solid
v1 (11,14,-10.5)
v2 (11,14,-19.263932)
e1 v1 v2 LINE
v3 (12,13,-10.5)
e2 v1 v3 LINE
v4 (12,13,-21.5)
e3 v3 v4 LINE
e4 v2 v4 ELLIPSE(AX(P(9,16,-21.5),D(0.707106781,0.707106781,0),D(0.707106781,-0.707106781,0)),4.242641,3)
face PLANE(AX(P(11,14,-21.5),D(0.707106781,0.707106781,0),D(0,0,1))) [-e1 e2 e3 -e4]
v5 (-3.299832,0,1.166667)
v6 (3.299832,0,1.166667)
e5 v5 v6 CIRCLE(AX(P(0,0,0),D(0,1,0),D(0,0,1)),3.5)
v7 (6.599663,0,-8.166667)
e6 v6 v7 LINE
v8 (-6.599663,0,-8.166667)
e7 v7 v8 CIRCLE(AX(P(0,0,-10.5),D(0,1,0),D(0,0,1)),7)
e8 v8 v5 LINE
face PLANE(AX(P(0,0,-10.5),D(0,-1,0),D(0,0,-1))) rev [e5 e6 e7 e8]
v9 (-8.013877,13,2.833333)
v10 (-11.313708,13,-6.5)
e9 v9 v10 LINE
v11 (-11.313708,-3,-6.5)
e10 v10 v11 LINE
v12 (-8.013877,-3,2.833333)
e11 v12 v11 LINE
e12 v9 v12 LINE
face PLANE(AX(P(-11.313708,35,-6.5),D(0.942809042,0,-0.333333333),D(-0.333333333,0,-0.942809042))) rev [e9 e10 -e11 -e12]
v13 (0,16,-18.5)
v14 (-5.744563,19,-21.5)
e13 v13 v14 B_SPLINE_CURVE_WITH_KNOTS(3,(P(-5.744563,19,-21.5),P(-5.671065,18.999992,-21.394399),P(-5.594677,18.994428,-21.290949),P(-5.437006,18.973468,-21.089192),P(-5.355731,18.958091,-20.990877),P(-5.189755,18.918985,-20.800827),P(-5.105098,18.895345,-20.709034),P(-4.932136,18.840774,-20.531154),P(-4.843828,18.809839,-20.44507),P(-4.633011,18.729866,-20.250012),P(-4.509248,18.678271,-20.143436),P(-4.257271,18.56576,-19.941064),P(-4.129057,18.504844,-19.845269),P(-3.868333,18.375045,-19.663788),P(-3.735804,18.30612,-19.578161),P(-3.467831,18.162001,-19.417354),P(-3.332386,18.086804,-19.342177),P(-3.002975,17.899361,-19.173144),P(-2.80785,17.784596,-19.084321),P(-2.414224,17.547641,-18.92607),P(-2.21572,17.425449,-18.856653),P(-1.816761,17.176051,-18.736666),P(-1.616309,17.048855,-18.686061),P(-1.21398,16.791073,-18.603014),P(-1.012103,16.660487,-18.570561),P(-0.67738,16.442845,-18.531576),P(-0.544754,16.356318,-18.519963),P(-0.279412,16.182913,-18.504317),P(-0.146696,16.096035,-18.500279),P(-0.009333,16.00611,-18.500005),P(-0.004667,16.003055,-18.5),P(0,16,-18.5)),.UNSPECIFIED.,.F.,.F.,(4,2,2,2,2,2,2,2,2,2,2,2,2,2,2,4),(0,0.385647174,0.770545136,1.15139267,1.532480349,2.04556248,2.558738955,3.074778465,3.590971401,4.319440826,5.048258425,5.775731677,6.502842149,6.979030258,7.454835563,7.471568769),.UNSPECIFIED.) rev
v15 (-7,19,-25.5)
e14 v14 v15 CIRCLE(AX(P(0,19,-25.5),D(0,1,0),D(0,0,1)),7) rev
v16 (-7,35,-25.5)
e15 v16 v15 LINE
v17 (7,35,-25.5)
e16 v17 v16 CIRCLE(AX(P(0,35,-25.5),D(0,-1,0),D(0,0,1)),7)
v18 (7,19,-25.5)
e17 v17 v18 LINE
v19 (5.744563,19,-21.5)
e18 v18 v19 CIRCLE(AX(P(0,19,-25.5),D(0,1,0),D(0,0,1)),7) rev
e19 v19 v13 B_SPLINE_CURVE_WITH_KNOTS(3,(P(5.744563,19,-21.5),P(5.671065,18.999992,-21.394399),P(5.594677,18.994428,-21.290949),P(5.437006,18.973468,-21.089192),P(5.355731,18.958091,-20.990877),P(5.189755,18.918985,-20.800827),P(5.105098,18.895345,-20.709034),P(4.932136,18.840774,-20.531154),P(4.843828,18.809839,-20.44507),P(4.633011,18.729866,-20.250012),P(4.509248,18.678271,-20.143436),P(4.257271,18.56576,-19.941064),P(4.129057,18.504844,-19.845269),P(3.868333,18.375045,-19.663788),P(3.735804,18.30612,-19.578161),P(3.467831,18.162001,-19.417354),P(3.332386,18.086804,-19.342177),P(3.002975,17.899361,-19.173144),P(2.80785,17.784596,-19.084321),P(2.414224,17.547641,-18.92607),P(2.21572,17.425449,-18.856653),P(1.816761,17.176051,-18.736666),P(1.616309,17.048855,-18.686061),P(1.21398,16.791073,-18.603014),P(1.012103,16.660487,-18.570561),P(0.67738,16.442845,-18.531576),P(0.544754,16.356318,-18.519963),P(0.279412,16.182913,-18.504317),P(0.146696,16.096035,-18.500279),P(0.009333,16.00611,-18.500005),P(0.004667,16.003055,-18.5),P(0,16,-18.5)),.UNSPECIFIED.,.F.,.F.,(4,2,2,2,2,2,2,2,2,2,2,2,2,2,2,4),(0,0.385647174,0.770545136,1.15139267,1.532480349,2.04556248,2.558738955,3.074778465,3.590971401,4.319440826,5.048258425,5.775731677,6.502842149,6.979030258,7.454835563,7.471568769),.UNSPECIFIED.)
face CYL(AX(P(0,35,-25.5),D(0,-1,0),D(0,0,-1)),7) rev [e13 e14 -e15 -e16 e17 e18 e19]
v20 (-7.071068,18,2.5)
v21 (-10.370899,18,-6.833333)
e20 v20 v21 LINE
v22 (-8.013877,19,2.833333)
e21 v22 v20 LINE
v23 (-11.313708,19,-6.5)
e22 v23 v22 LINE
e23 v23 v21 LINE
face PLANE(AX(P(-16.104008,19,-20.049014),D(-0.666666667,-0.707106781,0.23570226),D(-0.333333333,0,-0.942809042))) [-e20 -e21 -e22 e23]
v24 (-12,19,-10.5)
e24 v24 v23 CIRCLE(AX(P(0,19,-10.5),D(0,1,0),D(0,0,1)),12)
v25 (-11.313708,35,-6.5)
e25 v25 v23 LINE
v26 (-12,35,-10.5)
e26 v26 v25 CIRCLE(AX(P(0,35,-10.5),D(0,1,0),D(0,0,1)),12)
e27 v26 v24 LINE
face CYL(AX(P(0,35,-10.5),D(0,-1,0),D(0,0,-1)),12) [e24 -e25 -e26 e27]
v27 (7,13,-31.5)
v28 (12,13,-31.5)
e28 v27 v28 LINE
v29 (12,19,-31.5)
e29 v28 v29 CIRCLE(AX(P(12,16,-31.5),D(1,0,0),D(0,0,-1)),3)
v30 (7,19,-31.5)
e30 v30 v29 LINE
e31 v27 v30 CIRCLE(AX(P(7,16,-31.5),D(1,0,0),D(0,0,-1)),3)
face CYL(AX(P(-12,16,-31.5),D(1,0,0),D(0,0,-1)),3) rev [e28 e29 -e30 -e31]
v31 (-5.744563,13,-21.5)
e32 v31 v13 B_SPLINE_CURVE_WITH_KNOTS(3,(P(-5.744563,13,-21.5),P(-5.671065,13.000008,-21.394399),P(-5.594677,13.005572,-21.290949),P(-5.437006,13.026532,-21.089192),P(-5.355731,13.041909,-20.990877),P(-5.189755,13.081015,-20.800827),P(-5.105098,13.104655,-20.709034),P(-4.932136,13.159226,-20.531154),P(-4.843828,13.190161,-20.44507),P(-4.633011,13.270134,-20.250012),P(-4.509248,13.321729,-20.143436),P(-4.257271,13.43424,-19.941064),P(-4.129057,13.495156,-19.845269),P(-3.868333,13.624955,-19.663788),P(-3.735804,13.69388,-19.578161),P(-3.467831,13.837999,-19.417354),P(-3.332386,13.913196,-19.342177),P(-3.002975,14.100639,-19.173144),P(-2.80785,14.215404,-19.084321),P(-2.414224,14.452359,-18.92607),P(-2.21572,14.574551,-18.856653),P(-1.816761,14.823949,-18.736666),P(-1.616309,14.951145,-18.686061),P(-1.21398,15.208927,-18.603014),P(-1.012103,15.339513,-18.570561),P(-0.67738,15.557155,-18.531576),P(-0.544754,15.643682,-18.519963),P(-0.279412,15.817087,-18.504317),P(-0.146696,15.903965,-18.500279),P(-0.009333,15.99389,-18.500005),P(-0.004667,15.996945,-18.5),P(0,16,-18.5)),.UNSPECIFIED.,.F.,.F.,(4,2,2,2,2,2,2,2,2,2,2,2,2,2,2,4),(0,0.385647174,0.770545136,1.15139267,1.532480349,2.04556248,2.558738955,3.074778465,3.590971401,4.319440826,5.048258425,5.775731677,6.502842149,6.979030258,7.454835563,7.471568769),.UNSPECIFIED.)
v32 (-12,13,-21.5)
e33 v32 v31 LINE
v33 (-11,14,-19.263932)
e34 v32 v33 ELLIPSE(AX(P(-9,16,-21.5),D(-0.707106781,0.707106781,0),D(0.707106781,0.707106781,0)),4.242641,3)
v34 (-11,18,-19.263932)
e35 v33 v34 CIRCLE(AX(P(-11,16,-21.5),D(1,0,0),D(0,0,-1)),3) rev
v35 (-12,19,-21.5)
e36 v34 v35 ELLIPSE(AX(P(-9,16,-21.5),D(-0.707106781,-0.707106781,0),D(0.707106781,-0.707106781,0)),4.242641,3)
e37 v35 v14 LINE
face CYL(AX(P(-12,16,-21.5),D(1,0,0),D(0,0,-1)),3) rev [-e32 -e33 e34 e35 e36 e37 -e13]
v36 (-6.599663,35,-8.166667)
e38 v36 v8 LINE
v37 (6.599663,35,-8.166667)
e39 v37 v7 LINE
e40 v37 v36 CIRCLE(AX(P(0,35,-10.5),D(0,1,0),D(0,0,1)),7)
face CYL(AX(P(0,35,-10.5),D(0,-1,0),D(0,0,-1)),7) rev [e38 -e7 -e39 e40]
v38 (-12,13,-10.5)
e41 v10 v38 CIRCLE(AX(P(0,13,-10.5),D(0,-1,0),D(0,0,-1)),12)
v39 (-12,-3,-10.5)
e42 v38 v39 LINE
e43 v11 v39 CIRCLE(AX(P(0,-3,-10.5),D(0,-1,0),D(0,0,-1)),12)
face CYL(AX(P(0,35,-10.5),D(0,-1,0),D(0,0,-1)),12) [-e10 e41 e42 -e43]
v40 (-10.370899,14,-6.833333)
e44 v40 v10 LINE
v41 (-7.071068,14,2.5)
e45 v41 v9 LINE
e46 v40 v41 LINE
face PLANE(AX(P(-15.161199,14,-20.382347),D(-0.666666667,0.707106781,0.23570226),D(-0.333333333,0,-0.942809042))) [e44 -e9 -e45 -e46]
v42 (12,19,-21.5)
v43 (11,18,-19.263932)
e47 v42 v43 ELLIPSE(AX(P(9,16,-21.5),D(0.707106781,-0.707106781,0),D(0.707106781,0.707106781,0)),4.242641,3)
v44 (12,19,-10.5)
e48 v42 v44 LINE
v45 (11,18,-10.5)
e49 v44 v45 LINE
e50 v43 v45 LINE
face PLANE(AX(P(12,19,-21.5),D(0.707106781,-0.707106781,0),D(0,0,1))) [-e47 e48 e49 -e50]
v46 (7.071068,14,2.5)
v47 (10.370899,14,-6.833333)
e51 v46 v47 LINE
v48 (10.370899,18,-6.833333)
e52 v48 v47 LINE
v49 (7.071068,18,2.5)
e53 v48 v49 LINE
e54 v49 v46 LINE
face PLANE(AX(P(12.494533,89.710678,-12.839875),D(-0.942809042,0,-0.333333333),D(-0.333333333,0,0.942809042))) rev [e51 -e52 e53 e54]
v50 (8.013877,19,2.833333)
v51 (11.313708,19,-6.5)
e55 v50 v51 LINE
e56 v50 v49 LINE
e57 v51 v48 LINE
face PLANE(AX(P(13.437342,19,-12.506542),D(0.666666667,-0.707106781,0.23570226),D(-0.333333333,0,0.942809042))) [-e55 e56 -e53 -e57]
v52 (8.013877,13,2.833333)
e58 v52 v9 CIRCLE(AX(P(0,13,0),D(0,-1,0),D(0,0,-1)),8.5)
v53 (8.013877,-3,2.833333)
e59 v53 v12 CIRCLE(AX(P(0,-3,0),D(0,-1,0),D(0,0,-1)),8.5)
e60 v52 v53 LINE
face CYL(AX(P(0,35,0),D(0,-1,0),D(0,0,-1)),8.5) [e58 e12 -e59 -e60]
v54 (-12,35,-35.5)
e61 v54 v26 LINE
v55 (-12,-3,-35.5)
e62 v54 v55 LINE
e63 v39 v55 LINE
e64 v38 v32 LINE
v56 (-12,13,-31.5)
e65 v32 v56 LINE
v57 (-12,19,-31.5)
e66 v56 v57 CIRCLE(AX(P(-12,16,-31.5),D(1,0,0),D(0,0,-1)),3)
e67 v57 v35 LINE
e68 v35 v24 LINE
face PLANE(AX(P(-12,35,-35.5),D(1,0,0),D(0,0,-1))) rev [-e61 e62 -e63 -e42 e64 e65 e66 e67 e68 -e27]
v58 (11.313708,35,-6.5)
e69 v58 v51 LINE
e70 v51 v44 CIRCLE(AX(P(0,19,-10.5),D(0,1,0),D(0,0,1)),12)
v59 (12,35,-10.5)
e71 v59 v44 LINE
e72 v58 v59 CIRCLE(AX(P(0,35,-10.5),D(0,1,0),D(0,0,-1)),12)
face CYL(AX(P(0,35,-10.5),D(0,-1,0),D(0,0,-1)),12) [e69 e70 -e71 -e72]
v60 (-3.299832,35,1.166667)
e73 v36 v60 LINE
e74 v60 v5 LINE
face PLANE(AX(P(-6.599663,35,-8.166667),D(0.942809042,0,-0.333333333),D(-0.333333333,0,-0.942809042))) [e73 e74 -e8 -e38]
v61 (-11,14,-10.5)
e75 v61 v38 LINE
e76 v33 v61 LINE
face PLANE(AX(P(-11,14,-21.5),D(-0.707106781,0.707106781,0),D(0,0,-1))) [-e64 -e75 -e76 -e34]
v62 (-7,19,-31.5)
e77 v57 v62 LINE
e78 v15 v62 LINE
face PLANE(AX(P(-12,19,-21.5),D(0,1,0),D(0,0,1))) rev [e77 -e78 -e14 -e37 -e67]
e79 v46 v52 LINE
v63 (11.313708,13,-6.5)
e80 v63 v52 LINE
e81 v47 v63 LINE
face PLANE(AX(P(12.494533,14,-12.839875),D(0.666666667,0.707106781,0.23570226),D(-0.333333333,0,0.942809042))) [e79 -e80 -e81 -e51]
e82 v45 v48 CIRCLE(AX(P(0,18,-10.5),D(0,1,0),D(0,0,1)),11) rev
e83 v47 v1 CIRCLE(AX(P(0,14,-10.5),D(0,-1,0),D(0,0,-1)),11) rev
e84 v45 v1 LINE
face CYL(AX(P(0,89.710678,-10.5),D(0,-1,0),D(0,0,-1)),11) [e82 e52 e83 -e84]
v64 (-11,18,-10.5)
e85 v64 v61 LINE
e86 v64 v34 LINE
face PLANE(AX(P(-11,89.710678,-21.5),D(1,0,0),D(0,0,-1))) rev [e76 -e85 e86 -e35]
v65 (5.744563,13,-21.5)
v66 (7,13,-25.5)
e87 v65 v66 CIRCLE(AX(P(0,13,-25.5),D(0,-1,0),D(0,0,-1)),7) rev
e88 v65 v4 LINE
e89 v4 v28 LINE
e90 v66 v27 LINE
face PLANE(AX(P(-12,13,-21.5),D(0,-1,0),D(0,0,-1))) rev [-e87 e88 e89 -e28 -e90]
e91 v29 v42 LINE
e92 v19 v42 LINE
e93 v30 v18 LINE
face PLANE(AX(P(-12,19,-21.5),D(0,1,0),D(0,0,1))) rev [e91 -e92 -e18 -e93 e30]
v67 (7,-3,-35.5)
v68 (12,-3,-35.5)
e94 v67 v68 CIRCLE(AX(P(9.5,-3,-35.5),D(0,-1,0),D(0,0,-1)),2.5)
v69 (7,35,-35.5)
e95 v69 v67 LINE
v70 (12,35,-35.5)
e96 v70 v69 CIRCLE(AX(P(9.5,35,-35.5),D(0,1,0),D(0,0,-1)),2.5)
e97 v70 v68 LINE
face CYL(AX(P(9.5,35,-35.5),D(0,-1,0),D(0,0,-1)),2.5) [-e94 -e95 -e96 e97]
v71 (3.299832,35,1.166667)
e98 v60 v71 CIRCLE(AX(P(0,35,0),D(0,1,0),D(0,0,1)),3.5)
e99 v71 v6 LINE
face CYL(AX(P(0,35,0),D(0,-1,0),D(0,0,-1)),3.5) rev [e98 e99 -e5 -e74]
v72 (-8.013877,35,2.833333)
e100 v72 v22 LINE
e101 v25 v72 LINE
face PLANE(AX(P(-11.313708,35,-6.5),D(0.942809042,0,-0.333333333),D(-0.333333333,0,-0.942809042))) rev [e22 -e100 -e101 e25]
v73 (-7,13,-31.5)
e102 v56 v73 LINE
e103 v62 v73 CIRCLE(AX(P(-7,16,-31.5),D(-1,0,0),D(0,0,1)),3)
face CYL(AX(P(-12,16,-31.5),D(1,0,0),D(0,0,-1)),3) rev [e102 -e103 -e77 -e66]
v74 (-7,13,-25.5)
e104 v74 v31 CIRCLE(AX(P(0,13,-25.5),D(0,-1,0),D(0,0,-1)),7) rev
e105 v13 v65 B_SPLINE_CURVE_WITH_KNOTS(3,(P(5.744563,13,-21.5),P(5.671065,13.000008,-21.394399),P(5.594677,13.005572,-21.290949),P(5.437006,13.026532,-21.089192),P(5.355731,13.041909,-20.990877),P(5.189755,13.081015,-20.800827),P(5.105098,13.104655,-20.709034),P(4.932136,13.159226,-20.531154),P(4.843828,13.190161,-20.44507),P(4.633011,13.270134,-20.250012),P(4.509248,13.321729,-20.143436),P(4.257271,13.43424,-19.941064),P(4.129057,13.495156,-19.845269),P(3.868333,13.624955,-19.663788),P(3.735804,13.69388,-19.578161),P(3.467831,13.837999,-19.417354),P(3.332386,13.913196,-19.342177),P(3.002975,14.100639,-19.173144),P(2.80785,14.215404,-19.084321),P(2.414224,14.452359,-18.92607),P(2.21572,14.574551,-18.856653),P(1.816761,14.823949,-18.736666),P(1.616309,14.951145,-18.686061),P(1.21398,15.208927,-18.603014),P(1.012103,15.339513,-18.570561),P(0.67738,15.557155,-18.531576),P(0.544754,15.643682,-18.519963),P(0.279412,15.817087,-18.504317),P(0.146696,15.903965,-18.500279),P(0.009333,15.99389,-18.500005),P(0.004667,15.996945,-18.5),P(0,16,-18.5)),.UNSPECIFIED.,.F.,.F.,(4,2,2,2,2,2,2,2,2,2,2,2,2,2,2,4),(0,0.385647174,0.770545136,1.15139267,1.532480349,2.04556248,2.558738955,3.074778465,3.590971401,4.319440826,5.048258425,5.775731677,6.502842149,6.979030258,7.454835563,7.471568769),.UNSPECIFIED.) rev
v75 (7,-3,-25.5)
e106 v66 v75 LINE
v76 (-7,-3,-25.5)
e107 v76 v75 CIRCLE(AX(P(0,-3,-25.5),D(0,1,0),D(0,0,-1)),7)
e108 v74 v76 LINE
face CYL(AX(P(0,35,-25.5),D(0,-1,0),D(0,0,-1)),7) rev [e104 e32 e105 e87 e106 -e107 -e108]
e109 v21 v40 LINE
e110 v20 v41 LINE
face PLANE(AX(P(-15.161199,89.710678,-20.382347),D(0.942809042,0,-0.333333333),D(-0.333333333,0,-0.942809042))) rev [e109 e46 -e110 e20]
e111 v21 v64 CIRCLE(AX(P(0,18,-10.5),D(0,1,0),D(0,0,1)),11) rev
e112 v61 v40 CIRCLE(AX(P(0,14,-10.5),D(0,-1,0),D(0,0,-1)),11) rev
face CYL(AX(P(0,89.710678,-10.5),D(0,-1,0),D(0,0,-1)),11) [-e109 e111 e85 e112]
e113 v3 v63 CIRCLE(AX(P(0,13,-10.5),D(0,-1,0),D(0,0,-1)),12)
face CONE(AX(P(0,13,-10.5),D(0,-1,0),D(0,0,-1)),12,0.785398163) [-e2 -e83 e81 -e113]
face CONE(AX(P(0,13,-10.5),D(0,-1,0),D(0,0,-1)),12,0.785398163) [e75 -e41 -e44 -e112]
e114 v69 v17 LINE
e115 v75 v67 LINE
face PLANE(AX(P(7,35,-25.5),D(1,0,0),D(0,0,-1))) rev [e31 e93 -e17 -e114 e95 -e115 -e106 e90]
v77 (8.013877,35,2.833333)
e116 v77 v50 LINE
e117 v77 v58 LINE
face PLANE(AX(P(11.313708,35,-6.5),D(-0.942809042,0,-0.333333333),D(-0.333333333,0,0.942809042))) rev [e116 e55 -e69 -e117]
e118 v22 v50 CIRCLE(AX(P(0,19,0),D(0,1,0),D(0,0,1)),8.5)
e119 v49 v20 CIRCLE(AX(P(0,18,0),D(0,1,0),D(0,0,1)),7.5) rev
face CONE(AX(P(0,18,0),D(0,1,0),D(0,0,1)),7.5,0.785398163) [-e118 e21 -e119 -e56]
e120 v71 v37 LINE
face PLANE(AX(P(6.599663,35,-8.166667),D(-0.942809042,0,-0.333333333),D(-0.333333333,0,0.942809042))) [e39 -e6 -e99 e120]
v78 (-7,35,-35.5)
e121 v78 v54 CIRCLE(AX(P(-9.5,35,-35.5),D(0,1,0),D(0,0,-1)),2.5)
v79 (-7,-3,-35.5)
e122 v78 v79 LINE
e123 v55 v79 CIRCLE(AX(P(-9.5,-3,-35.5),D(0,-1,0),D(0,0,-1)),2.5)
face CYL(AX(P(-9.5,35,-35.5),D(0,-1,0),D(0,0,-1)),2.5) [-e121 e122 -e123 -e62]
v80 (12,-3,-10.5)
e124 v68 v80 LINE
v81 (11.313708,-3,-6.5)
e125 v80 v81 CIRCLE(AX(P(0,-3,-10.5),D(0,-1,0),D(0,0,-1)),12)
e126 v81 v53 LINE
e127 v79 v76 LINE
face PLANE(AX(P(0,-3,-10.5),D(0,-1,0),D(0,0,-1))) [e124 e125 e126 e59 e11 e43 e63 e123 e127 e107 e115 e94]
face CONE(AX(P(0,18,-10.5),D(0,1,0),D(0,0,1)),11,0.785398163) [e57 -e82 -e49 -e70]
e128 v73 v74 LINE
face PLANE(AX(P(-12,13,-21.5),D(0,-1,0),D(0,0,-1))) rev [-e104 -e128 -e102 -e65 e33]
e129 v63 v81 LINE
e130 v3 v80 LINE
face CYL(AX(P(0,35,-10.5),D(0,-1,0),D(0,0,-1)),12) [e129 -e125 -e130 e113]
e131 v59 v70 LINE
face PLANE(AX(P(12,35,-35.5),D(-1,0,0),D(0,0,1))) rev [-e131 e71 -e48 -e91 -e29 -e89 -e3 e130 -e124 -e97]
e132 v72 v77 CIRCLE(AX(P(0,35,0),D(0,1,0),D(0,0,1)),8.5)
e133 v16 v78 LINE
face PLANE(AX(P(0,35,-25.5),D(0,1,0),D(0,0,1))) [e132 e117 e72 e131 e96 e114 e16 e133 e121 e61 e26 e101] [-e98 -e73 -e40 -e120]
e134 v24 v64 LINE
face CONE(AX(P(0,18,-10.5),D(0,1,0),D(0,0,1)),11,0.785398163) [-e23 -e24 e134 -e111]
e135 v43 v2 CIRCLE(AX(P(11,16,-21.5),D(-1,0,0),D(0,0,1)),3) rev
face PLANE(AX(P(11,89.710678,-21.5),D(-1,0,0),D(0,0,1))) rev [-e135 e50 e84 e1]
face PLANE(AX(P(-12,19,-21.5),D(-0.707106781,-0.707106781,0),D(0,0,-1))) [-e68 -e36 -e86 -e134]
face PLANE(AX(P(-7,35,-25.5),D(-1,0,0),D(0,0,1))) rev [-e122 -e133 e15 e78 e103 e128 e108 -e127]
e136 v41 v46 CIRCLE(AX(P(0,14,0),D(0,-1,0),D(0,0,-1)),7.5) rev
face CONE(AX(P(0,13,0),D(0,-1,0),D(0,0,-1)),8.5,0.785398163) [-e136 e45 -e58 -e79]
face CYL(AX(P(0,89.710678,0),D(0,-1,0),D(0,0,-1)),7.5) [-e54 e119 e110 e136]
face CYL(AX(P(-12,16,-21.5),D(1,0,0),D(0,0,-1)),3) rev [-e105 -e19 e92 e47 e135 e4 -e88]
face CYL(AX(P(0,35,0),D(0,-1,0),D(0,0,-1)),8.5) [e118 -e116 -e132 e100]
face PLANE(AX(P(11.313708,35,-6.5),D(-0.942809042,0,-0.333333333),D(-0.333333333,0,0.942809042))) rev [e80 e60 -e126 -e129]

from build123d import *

# Parameters (mm, degrees)
BOSS_EXTRUDE1_DEPTH     = 35
BOSS_EXTRUDE2_START     = 3
BOSS_EXTRUDE2_DEPTH     = 3
CUT_EXTRUDE1_DEPTH      = 54.037722425
CUT_EXTRUDE1_DEPTH_BACK = 54.037722425
CUT_EXTRUDE2_START      = -3
CUT_EXTRUDE2_DEPTH      = 6
CHAMFER1_SIZE           = 1


with BuildPart() as part:
    # Sketch1 → Boss-Extrude1 (new body)
    with BuildSketch(Plane(origin=(0, 0, 0), x_dir=(1, 0, 0), z_dir=(0, 1, 0))):
        with BuildLine():
            Line((7, 25.5), (7, 35.5))
            ThreePointArc((7, 35.5), (9.5, 38), (12, 35.5))
            Line((12, 35.5), (12, 10.5))
            ThreePointArc((12, 10.5), (11.827182716, 8.470776255), (11.313708499, 6.5))
            Line((11.313708499, 6.5), (8.013876853, -2.833333333))
            ThreePointArc((8.013876853, -2.833333333), (0, -8.5), (-8.013876853, -2.833333333))
            Line((-8.013876853, -2.833333333), (-11.313708499, 6.5))
            ThreePointArc((-11.313708499, 6.5), (-11.827182716, 8.470776255), (-12, 10.5))
            Line((-12, 10.5), (-12, 35.5))
            ThreePointArc((-12, 35.5), (-9.5, 38), (-7, 35.5))
            Line((-7, 35.5), (-7, 25.5))
            ThreePointArc((-7, 25.5), (0, 18.5), (7, 25.5))
        make_face()
        with BuildLine():
            Line((-6.599663291, 8.166666667), (-3.299831646, -1.166666667))
            ThreePointArc((-3.299831646, -1.166666667), (0, -3.5), (3.299831646, -1.166666667))
            Line((3.299831646, -1.166666667), (6.599663291, 8.166666667))
            ThreePointArc((6.599663291, 8.166666667), (0, 17.5), (-6.599663291, 8.166666667))
        make_face(mode=Mode.SUBTRACT)
    extrude(amount=BOSS_EXTRUDE1_DEPTH)

    # Sketch2 → Boss-Extrude2 (add)
    with BuildSketch(Plane.XZ.offset(BOSS_EXTRUDE2_START)):
        with BuildLine():
            Line((-12, -10.5), (-12, -35.5))
            ThreePointArc((-12, -35.5), (-9.5, -38), (-7, -35.5))
            Line((-7, -35.5), (-7, -25.5))
            ThreePointArc((-7, -25.5), (0, -18.5), (7, -25.5))
            Line((7, -25.5), (7, -35.5))
            ThreePointArc((7, -35.5), (9.5, -38), (12, -35.5))
            Line((12, -35.5), (12, -10.5))
            ThreePointArc((12, -10.5), (11.827182716, -8.470776255), (11.313708499, -6.5))
            Line((11.313708499, -6.5), (8.013876853, 2.833333333))
            ThreePointArc((8.013876853, 2.833333333), (0, 8.5), (-8.013876853, 2.833333333))
            Line((-8.013876853, 2.833333333), (-11.313708499, -6.5))
            ThreePointArc((-11.313708499, -6.5), (-11.827182716, -8.470776255), (-12, -10.5))
        make_face()
    extrude(amount=-BOSS_EXTRUDE2_DEPTH)

    # Sketch4 → Cut-Extrude1 (cut, two sides: drawn at the far end of the back side and taken through both)
    with BuildSketch(Plane(origin=(0, 0, 0), x_dir=(0, 0, -1), z_dir=(1, 0, 0)).offset(-CUT_EXTRUDE1_DEPTH_BACK)):
        with BuildLine():
            Line((21.5, 19), (31.5, 19))
            ThreePointArc((31.5, 19), (34.5, 16), (31.5, 13))
            Line((31.5, 13), (21.5, 13))
            ThreePointArc((21.5, 13), (18.5, 16), (21.5, 19))
        make_face()
    extrude(amount=CUT_EXTRUDE1_DEPTH + CUT_EXTRUDE1_DEPTH_BACK, mode=Mode.SUBTRACT)

    # Sketch5 → Cut-Extrude2 (cut)
    with BuildSketch(Plane(origin=(0, 16, 0), x_dir=(1, 0, 0), z_dir=(0, 1, 0)).offset(CUT_EXTRUDE2_START)):
        with BuildLine():
            Line((-11, 21.5), (-25, 21.5))
            Line((-25, 21.5), (-25, -28.5))
            Line((-25, -28.5), (25, -28.5))
            Line((25, -28.5), (25, 21.5))
            Line((25, 21.5), (11, 21.5))
            Line((11, 21.5), (11, 10.5))
            ThreePointArc((11, 10.5), (10.841584156, 8.639878234), (10.370899457, 6.833333333))
            Line((10.370899457, 6.833333333), (7.071067812, -2.5))
            ThreePointArc((7.071067812, -2.5), (0, -7.5), (-7.071067812, -2.5))
            Line((-7.071067812, -2.5), (-10.370899457, 6.833333333))
            ThreePointArc((-10.370899457, 6.833333333), (-10.841584156, 8.639878234), (-11, 10.5))
            Line((-11, 10.5), (-11, 21.5))
        make_face()
    extrude(amount=CUT_EXTRUDE2_DEPTH, mode=Mode.SUBTRACT)

    # Chamfer1
    chamfer1_edges = [part.edges().sort_by_distance(p)[0] for p in [
        (11, 19, -16),
        (10.841584156, 19, -8.639878234),
        (0, 19, 7.5),
        (-10.841584156, 19, -8.639878234),
        (-11, 13, -16),
        (-8.720983635, 13, -2.166666667),
        (8.720983635, 13, -2.166666667),
        (11, 13, -16),
        (-11, 19, -16),
        (-8.720983635, 19, -2.166666667),
        (0, 13, 7.5),
        (8.720983635, 19, -2.166666667),
        (10.841584156, 13, -8.639878234),
        (-10.841584156, 13, -8.639878234),
    ]]
    chamfer(chamfer1_edges, length=CHAMFER1_SIZE - 0.0001)  # a hair under: the kernel refuses the full size


solid = part.part
